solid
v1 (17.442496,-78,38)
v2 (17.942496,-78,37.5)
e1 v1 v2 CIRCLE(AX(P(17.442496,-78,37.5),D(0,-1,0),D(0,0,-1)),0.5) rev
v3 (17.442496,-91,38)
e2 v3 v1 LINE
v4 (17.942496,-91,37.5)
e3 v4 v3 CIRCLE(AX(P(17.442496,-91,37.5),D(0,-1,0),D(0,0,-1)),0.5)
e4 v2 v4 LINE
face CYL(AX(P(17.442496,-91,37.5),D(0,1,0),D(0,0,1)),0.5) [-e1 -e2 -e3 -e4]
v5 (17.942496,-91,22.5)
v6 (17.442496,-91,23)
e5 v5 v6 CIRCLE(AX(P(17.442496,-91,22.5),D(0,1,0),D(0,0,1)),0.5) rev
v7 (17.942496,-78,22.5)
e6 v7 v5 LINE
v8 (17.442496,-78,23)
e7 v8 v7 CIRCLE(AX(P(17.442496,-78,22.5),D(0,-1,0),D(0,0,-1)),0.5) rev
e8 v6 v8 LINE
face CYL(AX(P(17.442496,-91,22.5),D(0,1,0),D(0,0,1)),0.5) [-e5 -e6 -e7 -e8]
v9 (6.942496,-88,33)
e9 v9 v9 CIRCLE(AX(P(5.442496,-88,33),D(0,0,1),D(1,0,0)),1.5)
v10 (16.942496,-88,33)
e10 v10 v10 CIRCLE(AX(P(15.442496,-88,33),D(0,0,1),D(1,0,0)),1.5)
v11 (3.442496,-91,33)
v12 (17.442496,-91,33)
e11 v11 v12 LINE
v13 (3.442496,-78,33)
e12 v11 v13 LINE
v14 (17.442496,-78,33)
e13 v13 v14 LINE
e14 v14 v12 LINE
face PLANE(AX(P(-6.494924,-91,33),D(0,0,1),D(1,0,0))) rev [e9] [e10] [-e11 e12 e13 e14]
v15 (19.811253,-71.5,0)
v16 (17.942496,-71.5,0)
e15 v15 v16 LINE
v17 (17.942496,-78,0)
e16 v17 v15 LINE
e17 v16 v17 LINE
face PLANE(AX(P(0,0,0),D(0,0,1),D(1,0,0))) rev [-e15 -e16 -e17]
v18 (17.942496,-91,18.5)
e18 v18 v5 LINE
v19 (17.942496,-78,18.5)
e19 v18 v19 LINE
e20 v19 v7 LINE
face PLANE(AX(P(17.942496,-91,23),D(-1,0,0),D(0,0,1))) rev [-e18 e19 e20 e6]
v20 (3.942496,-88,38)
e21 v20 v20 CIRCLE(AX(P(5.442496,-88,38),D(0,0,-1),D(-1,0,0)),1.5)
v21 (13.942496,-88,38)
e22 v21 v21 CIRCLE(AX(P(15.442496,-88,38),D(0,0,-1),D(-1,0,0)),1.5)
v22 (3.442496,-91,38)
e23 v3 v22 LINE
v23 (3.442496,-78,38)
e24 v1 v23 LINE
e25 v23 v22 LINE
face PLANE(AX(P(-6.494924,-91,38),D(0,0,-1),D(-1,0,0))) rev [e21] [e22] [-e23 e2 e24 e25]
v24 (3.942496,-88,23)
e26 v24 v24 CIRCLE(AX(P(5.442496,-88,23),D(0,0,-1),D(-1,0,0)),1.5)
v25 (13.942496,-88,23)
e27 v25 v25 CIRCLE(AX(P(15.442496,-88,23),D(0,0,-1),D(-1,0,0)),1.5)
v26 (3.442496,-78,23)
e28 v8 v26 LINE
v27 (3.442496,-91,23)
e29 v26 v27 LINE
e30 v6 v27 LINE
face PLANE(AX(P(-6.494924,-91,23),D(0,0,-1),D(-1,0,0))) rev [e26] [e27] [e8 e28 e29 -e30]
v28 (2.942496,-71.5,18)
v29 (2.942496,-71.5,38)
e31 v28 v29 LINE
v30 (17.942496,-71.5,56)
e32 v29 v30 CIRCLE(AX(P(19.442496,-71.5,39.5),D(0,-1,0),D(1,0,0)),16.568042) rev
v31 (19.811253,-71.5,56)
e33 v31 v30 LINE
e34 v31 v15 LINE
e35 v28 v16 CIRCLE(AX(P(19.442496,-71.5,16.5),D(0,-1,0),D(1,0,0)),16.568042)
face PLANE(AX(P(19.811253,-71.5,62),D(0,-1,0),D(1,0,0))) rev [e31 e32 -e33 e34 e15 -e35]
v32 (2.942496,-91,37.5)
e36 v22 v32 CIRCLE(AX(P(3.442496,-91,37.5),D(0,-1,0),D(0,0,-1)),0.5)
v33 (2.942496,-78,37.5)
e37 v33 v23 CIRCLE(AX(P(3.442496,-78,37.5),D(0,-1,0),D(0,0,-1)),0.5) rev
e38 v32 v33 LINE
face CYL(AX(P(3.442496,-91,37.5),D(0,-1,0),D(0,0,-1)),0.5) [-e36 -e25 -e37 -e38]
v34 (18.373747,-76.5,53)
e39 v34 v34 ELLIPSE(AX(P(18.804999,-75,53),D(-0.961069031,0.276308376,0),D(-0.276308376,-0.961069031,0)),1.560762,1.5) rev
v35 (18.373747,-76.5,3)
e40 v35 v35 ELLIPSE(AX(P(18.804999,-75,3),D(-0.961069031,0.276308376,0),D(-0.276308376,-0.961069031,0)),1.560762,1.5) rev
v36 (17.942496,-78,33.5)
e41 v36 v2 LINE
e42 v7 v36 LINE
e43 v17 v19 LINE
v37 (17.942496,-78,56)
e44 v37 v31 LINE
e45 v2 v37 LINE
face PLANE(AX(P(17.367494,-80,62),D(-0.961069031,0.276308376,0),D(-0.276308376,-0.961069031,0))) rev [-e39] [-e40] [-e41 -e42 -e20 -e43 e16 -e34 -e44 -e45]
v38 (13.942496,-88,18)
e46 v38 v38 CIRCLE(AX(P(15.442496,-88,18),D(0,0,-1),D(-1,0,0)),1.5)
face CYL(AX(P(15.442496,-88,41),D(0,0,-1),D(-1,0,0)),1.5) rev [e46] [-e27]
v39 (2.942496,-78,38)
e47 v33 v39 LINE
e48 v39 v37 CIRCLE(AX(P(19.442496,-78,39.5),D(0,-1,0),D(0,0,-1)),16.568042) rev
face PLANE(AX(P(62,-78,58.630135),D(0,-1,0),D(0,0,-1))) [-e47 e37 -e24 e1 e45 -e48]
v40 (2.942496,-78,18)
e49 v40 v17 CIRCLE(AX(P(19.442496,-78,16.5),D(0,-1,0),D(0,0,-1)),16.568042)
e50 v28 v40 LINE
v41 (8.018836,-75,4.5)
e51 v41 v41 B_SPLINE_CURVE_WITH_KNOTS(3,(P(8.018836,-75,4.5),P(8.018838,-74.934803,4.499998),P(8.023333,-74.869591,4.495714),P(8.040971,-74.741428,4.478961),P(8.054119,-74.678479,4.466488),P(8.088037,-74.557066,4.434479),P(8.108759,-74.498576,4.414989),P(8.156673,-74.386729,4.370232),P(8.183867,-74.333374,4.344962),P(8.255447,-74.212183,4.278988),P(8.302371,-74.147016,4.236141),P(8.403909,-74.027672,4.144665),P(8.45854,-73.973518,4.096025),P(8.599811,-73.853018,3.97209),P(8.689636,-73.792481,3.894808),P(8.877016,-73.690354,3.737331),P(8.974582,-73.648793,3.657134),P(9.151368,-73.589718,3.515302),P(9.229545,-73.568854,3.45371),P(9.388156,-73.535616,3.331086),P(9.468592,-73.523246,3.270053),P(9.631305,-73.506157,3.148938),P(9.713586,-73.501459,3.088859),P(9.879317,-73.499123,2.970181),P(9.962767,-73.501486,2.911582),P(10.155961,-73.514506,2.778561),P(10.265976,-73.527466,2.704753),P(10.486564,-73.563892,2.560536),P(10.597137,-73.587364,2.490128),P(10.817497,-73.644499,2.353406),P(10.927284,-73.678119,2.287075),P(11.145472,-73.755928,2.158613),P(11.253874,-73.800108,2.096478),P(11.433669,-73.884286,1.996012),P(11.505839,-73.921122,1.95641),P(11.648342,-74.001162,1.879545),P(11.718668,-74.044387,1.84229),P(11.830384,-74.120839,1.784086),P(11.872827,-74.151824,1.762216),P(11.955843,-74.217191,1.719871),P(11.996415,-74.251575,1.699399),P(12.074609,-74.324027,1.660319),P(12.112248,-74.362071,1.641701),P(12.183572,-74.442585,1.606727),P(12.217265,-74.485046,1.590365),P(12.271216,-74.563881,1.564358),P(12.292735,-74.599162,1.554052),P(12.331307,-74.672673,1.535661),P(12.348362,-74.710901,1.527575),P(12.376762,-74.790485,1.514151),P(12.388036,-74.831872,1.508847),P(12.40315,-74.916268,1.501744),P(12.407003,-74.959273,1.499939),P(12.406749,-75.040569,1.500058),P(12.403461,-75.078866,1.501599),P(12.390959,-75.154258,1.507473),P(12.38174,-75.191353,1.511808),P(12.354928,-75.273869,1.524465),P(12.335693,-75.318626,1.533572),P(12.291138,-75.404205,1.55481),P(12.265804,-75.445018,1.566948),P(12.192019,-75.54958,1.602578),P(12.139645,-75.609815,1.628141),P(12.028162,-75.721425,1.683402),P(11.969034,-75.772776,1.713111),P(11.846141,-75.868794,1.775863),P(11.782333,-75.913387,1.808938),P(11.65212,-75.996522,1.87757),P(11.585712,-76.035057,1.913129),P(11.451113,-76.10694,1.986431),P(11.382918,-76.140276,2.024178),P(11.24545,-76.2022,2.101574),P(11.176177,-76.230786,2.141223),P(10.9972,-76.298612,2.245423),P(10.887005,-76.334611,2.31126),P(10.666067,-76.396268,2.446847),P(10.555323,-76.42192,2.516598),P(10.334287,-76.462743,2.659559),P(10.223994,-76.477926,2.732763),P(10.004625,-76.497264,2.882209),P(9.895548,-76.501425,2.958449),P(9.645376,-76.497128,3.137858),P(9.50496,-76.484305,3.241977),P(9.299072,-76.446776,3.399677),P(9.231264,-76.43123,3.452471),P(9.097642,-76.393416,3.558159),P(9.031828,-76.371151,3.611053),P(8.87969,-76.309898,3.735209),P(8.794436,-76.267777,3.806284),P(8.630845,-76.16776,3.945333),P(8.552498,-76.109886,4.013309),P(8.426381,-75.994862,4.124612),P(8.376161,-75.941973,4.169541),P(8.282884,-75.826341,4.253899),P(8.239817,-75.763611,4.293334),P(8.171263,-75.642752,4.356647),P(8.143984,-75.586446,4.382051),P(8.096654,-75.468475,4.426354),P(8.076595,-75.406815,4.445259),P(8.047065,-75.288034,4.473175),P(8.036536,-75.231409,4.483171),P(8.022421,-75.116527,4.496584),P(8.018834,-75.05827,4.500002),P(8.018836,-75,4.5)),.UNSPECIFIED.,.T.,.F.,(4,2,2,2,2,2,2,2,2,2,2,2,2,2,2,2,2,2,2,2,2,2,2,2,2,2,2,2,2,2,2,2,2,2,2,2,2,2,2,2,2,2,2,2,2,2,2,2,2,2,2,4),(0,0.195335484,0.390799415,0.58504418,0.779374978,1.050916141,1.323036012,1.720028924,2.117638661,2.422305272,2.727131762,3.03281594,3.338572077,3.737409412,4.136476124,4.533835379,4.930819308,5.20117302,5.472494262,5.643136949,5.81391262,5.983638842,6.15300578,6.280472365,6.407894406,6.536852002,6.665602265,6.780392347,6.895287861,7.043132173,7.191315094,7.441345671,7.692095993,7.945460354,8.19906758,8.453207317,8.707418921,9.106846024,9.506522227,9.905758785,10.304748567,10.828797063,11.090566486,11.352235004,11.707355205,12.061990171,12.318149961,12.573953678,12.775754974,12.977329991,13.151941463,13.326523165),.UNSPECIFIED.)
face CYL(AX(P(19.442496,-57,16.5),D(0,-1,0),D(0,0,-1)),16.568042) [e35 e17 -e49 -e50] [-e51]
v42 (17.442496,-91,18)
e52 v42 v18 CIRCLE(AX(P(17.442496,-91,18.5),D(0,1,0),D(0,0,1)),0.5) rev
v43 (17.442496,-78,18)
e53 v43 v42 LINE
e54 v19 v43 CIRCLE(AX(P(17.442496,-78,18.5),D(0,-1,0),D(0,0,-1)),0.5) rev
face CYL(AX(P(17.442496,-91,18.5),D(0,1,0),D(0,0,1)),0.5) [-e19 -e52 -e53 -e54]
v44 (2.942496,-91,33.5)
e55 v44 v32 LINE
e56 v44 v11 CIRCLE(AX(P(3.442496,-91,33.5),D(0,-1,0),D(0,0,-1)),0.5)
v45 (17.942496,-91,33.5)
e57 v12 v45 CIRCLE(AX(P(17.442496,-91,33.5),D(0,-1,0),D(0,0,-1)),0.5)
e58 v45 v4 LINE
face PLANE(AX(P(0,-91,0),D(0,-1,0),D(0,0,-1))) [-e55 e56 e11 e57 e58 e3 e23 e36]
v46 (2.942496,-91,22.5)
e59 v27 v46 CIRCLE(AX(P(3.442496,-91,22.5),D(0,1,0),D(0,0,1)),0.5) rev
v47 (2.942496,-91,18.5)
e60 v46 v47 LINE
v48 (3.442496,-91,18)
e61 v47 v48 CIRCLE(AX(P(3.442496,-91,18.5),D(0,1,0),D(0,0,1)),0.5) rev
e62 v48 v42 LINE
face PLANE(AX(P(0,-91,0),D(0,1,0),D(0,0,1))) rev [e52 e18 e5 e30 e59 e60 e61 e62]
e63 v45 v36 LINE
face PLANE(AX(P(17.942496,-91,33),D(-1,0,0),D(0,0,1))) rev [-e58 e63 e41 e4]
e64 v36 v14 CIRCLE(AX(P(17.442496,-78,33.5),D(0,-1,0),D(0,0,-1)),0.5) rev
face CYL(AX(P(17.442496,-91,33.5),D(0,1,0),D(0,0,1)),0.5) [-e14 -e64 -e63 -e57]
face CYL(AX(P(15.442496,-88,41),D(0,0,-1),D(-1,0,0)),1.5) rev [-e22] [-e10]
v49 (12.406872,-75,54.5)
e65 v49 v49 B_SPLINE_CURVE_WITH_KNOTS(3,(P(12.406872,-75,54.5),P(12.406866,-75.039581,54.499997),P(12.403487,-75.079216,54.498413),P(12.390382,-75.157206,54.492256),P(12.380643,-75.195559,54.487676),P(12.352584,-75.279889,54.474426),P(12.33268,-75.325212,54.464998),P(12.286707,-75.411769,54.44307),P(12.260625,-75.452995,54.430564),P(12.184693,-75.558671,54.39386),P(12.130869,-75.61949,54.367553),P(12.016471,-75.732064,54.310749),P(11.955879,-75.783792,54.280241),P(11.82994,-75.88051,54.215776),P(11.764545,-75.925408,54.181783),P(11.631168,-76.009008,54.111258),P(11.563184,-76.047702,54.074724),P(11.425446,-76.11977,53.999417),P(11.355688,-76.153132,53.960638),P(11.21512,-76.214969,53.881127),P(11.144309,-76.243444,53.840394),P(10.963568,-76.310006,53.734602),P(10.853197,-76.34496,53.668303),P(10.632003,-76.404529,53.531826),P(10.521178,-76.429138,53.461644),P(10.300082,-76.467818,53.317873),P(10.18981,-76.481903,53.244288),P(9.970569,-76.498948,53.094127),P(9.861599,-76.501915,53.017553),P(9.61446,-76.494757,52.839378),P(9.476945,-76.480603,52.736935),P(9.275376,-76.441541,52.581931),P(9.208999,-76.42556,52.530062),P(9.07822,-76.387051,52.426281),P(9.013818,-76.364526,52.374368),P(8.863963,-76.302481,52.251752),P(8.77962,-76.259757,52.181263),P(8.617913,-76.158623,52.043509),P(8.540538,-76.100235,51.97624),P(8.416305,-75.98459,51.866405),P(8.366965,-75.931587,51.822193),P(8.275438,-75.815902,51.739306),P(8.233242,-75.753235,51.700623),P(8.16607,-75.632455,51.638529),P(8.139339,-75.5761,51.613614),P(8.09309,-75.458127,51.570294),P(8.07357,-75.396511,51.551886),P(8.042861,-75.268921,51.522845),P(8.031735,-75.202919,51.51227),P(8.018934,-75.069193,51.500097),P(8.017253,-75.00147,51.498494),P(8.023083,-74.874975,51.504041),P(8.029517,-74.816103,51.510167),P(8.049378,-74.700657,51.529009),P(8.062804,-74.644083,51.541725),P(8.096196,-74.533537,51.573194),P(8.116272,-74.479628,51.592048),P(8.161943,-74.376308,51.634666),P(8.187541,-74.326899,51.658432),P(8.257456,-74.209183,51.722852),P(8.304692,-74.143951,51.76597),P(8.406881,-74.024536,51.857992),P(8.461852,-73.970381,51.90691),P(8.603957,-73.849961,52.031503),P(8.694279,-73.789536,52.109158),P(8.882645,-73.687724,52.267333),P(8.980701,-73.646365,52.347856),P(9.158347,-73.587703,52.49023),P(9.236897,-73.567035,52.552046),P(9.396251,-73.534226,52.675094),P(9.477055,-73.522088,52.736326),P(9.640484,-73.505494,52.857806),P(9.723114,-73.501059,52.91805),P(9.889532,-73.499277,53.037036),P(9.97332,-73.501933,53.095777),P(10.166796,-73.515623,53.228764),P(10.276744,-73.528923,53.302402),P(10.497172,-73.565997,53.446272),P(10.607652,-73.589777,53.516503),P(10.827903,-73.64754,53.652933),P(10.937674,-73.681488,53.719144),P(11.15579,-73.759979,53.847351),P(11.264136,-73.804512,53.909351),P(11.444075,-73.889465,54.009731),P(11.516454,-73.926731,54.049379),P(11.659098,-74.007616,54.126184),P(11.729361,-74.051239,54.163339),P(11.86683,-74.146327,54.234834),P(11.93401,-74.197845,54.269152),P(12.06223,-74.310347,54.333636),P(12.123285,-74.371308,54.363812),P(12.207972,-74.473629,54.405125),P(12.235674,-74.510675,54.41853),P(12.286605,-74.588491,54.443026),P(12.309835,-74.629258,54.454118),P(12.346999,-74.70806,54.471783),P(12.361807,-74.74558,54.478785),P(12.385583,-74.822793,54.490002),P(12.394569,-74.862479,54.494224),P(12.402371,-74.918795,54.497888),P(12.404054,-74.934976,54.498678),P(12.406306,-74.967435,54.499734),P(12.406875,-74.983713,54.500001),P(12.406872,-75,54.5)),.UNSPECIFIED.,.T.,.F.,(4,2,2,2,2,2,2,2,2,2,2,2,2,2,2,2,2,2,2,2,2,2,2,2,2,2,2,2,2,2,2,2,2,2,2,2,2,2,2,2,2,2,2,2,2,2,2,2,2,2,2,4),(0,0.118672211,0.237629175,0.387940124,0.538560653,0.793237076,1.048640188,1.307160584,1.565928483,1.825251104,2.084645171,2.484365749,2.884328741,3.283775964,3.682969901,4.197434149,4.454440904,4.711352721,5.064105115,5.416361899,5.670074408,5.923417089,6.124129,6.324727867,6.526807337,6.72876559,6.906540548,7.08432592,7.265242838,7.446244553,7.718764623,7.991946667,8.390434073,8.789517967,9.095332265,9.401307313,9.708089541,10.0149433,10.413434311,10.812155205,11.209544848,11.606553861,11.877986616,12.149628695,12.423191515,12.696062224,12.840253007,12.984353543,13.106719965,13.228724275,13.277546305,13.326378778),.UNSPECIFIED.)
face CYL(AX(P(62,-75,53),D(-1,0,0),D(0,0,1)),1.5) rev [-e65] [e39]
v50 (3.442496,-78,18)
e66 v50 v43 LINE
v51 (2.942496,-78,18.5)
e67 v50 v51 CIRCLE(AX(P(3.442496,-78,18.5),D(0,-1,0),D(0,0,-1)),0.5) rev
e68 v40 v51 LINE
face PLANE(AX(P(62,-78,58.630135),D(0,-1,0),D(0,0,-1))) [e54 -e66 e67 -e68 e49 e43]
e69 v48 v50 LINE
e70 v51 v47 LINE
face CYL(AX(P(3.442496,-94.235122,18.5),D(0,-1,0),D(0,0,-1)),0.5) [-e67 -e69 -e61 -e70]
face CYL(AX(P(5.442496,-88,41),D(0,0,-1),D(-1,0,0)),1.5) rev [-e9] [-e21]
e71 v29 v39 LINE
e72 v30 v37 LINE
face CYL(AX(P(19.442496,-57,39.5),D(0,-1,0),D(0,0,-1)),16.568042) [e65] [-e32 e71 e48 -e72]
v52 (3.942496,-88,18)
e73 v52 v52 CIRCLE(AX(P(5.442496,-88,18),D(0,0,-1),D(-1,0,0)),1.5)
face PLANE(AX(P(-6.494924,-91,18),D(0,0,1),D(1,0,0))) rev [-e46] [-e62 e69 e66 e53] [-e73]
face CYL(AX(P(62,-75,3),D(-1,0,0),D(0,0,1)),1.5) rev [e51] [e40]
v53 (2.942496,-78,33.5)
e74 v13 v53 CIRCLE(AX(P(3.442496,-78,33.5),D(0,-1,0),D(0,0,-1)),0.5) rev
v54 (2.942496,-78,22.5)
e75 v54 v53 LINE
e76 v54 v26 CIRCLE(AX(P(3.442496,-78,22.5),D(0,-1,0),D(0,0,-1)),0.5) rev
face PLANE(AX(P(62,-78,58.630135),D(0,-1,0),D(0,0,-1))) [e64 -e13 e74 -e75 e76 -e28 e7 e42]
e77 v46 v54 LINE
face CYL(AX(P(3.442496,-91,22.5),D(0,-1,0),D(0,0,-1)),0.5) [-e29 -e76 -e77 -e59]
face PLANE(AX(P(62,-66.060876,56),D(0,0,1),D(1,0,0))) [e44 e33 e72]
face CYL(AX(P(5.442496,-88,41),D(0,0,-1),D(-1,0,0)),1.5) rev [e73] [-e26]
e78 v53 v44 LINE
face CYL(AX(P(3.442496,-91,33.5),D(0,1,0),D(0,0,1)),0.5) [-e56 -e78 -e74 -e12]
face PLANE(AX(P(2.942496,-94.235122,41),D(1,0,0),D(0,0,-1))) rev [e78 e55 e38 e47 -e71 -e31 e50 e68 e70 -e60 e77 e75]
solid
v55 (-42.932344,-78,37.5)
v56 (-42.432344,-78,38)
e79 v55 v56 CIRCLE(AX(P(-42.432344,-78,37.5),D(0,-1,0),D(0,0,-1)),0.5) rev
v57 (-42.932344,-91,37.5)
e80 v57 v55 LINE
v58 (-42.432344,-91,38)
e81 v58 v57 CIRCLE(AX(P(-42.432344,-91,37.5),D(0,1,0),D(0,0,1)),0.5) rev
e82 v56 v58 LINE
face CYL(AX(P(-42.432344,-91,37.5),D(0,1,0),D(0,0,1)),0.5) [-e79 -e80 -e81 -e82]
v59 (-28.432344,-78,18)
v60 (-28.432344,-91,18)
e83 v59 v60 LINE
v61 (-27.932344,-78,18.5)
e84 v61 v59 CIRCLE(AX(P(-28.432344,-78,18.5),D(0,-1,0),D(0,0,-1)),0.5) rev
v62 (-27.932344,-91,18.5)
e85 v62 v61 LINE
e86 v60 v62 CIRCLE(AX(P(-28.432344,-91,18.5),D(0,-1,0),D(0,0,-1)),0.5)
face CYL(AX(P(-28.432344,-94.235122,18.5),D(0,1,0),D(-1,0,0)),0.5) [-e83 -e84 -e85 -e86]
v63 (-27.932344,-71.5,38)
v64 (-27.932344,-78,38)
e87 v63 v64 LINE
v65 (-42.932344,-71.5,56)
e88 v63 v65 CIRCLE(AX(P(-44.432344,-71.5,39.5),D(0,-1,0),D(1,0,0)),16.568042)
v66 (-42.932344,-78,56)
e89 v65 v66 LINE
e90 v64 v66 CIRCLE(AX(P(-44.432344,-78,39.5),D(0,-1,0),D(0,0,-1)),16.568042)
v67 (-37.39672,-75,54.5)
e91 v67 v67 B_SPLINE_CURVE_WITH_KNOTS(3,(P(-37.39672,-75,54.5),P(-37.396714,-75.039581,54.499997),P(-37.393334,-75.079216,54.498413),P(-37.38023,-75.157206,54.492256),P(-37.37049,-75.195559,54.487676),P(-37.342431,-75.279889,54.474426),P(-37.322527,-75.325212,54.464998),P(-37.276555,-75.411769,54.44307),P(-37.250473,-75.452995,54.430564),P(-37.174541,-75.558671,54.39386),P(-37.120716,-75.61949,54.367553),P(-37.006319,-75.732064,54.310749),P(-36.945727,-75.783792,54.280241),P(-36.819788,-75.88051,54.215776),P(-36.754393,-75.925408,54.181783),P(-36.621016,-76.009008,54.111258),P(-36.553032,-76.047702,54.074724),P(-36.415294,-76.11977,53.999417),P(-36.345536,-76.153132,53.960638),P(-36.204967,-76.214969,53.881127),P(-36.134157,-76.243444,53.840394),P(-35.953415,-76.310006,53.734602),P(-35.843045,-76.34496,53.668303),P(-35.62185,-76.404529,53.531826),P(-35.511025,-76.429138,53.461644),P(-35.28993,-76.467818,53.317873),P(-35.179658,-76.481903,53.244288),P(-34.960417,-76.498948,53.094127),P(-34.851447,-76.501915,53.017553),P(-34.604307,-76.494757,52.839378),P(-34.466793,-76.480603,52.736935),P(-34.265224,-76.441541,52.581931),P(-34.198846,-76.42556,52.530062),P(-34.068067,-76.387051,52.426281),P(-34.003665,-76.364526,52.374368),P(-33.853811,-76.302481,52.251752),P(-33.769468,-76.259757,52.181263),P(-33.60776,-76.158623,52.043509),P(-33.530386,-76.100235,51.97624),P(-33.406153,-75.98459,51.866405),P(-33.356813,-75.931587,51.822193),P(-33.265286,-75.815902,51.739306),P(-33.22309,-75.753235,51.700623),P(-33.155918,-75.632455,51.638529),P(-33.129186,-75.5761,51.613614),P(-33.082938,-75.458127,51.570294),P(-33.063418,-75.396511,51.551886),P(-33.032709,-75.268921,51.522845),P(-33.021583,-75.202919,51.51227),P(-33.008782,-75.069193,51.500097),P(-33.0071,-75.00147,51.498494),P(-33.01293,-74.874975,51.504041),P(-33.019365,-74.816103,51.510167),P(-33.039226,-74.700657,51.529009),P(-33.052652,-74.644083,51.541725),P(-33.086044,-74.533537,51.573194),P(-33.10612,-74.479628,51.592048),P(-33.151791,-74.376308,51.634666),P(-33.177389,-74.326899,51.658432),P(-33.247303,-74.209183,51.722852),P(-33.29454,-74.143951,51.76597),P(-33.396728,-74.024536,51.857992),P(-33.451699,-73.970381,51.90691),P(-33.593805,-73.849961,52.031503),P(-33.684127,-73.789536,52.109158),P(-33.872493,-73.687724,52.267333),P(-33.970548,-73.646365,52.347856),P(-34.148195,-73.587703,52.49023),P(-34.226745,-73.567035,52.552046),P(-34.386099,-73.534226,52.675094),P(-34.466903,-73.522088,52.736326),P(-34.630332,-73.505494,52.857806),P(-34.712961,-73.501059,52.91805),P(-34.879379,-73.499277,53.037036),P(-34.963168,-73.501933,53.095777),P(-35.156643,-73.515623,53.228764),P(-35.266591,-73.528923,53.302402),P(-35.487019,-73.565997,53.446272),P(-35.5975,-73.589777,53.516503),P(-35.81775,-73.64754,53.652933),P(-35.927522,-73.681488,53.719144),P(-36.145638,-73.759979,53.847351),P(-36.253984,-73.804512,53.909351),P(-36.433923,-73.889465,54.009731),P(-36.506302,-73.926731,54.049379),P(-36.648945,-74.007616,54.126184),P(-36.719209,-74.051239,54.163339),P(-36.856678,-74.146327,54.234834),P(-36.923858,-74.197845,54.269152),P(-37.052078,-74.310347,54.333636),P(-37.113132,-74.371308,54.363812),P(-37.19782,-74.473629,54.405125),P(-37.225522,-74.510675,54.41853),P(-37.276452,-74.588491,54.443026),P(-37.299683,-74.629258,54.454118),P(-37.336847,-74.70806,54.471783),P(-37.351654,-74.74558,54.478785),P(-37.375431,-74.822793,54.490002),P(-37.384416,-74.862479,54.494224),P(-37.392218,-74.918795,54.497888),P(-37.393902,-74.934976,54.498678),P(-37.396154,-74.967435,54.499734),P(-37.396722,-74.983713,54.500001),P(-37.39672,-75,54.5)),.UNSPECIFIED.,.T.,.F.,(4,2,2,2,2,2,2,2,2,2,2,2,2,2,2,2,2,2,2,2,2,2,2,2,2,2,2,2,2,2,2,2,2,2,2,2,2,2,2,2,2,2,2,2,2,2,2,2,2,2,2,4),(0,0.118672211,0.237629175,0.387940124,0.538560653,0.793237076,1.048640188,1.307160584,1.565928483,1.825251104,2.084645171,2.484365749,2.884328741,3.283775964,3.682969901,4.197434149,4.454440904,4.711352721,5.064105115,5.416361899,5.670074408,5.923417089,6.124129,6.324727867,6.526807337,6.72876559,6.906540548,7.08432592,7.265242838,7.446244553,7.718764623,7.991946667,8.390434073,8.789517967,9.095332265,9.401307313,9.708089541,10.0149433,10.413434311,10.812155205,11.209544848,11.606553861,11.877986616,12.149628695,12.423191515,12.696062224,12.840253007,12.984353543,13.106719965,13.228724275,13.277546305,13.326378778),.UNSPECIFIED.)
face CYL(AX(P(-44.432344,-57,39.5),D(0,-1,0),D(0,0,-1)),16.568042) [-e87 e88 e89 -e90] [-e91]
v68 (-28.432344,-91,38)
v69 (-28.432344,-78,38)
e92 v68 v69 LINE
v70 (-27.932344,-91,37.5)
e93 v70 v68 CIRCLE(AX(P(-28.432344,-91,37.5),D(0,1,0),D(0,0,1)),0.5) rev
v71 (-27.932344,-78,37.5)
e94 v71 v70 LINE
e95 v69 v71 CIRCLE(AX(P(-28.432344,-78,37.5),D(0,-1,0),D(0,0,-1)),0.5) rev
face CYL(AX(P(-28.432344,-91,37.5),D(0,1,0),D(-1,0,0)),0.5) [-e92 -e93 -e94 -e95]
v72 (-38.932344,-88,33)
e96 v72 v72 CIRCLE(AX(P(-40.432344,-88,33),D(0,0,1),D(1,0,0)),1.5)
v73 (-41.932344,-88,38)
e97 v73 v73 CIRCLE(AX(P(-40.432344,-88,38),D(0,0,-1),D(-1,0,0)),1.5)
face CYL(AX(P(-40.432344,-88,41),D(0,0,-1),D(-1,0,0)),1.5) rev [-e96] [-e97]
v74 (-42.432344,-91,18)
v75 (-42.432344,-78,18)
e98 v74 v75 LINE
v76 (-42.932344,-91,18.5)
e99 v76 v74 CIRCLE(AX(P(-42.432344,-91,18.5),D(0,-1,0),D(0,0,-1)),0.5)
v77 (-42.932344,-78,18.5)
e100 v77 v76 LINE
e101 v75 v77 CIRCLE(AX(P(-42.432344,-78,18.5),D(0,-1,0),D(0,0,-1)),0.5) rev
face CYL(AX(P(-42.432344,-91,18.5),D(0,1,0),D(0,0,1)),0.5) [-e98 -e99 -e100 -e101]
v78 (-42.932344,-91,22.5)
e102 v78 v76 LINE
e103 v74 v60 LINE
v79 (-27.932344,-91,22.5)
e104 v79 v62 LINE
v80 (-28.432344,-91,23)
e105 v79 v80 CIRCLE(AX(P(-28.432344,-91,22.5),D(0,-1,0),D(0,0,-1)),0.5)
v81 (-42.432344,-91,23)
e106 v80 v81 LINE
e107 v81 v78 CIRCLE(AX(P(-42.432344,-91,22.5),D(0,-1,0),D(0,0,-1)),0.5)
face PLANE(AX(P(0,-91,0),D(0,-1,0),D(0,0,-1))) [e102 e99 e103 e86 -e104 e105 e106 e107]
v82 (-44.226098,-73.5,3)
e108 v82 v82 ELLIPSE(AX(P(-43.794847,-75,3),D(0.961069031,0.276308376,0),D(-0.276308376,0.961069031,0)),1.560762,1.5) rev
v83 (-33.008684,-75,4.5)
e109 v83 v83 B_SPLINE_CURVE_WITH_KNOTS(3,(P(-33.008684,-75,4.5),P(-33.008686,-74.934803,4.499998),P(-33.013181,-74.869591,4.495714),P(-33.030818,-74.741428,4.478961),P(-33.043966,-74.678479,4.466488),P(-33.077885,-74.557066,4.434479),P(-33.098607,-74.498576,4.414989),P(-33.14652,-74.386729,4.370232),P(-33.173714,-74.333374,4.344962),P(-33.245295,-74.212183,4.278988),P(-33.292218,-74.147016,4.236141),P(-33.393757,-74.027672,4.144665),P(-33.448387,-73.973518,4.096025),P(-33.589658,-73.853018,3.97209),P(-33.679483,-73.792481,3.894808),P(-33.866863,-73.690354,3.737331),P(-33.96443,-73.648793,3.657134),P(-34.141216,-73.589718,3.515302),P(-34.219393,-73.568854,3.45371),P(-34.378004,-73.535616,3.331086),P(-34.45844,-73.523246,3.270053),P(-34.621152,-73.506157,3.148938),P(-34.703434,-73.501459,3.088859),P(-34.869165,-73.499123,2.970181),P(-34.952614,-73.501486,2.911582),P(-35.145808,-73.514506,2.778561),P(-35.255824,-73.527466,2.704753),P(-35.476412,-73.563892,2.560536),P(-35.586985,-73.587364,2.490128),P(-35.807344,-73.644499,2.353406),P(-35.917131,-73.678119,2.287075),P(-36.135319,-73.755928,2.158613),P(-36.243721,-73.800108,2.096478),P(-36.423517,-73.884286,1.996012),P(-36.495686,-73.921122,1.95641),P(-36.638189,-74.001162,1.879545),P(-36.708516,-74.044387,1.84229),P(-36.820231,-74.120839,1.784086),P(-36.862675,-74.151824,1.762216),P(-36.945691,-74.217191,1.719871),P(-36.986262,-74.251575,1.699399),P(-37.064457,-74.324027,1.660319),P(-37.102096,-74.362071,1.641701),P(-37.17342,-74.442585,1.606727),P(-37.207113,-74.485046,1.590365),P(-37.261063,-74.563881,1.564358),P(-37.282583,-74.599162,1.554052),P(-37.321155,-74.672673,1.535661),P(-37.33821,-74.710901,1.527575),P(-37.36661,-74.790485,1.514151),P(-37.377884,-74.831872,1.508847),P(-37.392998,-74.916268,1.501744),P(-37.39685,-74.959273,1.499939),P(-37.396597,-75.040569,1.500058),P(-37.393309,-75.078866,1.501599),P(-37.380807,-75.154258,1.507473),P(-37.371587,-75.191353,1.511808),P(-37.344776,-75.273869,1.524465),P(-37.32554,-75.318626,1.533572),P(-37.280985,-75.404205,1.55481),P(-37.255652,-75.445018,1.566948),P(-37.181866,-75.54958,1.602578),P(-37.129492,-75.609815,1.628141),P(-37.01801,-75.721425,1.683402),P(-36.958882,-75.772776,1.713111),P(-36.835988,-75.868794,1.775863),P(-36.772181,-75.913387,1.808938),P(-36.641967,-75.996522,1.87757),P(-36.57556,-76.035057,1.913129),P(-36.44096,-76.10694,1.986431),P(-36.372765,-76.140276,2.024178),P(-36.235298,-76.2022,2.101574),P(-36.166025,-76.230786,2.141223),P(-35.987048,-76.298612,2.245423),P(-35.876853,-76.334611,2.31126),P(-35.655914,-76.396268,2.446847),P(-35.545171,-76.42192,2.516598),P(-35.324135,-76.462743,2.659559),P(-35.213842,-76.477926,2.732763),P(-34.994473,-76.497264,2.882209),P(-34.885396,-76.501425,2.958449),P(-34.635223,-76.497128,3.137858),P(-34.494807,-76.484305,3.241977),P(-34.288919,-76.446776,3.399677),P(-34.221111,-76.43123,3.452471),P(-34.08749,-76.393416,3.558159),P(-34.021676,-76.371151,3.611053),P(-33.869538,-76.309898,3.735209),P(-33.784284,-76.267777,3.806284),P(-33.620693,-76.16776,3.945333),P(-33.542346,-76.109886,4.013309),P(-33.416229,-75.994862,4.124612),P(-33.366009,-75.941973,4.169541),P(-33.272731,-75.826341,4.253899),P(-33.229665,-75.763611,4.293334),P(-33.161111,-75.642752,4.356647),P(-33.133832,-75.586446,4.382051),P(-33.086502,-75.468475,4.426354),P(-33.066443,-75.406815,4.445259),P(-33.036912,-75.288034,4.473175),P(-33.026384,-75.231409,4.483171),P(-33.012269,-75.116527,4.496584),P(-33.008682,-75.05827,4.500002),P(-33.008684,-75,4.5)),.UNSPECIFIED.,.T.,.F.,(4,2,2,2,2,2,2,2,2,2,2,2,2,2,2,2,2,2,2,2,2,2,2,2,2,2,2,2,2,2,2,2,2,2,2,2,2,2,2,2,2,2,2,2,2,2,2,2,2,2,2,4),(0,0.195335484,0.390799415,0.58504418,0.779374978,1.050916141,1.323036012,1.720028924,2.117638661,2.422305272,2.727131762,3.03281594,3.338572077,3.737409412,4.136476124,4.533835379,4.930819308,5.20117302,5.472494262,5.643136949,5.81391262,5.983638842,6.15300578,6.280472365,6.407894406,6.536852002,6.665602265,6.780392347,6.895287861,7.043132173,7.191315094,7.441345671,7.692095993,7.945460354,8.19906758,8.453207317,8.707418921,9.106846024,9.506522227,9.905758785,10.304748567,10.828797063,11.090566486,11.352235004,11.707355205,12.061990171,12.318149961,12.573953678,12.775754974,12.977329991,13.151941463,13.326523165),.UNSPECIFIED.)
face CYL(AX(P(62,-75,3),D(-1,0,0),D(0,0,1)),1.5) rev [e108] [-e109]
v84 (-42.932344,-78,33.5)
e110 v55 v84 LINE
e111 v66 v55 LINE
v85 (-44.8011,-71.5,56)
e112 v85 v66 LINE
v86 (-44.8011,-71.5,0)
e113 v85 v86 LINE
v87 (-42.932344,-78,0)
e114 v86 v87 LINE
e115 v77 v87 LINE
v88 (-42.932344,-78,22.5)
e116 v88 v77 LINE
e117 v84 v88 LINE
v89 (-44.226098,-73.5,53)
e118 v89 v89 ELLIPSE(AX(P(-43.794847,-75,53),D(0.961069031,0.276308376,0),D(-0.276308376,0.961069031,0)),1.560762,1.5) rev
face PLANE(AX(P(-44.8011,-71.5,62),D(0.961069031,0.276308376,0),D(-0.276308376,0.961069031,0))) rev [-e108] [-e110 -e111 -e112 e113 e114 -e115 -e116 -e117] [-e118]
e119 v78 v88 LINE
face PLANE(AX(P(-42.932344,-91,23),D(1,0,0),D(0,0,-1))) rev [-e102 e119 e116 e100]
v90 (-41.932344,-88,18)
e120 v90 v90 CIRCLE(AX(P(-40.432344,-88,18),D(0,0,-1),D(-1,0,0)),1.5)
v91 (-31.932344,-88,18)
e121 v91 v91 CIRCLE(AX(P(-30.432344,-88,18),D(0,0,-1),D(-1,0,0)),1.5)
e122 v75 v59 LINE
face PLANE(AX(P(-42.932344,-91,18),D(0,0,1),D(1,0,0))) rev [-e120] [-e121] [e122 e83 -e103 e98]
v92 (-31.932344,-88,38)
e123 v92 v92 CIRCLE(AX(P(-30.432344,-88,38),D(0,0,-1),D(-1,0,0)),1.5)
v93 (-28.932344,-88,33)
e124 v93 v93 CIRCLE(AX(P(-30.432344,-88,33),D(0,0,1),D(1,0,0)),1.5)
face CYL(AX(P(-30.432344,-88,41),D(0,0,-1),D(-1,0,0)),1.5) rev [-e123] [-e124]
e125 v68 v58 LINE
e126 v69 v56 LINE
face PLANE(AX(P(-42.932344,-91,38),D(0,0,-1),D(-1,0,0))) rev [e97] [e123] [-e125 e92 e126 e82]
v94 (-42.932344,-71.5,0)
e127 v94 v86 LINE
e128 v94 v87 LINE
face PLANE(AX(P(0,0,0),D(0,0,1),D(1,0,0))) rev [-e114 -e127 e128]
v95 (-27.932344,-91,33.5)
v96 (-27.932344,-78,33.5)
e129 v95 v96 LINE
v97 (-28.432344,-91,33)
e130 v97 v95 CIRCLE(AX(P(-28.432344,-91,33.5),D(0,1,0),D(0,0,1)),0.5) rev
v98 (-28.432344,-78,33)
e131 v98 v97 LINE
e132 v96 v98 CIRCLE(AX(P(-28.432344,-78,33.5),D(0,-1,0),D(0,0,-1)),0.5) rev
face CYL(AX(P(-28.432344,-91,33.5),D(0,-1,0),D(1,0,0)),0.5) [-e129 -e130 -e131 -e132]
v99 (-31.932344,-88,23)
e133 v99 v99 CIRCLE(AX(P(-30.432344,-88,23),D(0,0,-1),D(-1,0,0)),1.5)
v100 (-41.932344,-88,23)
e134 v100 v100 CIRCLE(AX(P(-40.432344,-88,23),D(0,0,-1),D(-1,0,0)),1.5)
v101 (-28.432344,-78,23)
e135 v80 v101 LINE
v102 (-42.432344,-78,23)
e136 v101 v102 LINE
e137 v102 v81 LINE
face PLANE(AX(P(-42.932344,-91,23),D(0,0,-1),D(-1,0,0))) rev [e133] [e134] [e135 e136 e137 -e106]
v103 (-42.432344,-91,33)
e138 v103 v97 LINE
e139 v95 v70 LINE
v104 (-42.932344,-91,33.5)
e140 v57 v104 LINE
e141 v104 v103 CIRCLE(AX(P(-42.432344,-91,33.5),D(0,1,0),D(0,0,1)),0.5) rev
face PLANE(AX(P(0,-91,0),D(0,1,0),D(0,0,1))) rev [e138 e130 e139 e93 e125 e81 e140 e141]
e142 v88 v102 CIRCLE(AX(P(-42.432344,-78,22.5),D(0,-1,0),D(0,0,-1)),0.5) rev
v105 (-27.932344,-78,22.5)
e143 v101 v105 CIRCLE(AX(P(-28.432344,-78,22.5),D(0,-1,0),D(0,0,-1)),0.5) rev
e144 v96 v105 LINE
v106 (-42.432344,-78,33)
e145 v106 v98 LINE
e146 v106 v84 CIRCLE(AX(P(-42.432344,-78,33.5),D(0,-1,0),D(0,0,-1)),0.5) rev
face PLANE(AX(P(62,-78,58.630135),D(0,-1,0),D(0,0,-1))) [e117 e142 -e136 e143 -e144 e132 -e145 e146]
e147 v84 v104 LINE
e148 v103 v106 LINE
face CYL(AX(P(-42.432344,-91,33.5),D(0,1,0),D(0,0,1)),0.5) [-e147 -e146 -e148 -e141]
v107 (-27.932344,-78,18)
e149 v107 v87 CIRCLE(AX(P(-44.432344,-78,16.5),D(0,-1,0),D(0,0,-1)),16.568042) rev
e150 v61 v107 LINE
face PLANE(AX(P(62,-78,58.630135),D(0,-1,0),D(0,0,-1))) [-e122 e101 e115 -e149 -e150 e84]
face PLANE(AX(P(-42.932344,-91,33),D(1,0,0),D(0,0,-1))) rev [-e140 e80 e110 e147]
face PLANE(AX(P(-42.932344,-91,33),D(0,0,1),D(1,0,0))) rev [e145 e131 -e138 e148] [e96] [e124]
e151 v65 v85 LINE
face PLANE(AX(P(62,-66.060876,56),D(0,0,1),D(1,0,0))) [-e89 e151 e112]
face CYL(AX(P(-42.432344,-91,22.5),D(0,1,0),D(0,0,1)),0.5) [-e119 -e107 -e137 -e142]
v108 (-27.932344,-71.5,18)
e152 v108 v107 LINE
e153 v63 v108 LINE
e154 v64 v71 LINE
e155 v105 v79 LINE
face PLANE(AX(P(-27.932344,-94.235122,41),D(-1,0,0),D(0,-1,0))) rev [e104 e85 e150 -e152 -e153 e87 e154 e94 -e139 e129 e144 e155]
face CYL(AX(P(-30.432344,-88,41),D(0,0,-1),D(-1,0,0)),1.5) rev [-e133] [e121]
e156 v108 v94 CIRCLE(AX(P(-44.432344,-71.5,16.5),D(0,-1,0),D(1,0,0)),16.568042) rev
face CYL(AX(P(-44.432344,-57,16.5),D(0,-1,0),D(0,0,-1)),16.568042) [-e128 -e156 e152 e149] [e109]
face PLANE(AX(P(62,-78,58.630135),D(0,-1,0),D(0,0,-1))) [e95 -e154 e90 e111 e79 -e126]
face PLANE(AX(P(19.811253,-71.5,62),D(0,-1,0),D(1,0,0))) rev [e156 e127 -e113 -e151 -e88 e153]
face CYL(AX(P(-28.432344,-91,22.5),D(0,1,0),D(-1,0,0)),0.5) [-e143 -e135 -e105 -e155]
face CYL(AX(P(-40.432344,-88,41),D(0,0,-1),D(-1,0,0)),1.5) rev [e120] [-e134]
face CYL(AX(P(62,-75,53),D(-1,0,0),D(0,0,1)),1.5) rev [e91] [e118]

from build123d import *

# Parameters (mm, degrees)
BOSS_EXTRUDE1_DEPTH     = 62
CUT_EXTRUDE1_DEPTH      = 62
CUT_EXTRUDE1_DEPTH_BACK = 62
SKETCH2_R               = 1.5
CUT_EXTRUDE2_DEPTH      = 62
CUT_EXTRUDE2_DEPTH_BACK = 62
SKETCH3_W               = 8.022178305
SKETCH3_H               = 21.045195033
CUT_EXTRUDE3_DEPTH      = 62
CUT_EXTRUDE3_DEPTH_BACK = 62
SKETCH4_W               = 61.260270692
SKETCH4_H               = 6.493024082
SKETCH5_W               = 24.437419654
SKETCH5_H               = 5
BOSS_EXTRUDE2_DEPTH     = 13
SKETCH7_R               = 1.5
SKETCH7_W               = 30.874839308
SKETCH7_H               = 16.235122229
CUT_EXTRUDE4_DEPTH      = 23
CUT_EXTRUDE5_DEPTH      = 20
CUT_EXTRUDE5_DEPTH_BACK = 21
FILLET1_R               = 0.5
FILLET2_R               = 0.5
FILLET3_R               = 0.5
FILLET4_R               = 0.5
FILLET5_R               = 0.5
FILLET6_R               = 0.5
FILLET7_R               = 0.5
FILLET8_R               = 0.5
FILLET9_R               = 0.5
FILLET10_R              = 0.5
FILLET11_R              = 0.5
FILLET12_R              = 0.5
FILLET13_R              = 0.5
FILLET14_R              = 0.5
FILLET15_R              = 0.5
FILLET16_R              = 0.5


with BuildPart() as part:
    # Sketch1 → Boss-Extrude1 (new body)
    with BuildSketch(Plane.XY):
        Polygon((-42.357341369, -80), (17.367493653, -80), (19.811252759, -71.5), (-44.801100475, -71.5), align=None)
    extrude(amount=BOSS_EXTRUDE1_DEPTH)

    # Sketch2 → Cut-Extrude1 (cut, two sides: drawn at the far end of the back side and taken through both)
    with BuildSketch(Plane(origin=(0, 0, 0), x_dir=(0, 0, -1), z_dir=(1, 0, 0)).offset(-CUT_EXTRUDE1_DEPTH_BACK)):
        with Locations(Location((-53, -75, 0), (0, 0, 90))):
            Circle(SKETCH2_R)
        with Locations(Location((-3, -75, 0), (0, 0, 90))):
            Circle(SKETCH2_R)
    extrude(amount=CUT_EXTRUDE1_DEPTH + CUT_EXTRUDE1_DEPTH_BACK, mode=Mode.SUBTRACT)

    # Sketch3 → Cut-Extrude2 (cut, two sides: drawn at the far end of the back side and taken through both)
    with BuildSketch(Plane(origin=(0, 0, 0), x_dir=(0, 0, -1), z_dir=(1, 0, 0)).offset(-CUT_EXTRUDE2_DEPTH_BACK)):
        with Locations((-60.011089152, -76.583473071)):
            Rectangle(SKETCH3_W, SKETCH3_H)
    extrude(amount=CUT_EXTRUDE2_DEPTH + CUT_EXTRUDE2_DEPTH_BACK, mode=Mode.SUBTRACT)

    # Sketch4 → Cut-Extrude3 (cut, two sides: drawn at the far end of the back side and taken through both)
    with BuildSketch(Plane(origin=(0, 0, 0), x_dir=(0, 0, -1), z_dir=(1, 0, 0)).offset(-CUT_EXTRUDE3_DEPTH_BACK)):
        with Locations((-28, -81.246512041)):
            Rectangle(SKETCH4_W, SKETCH4_H)
    extrude(amount=CUT_EXTRUDE3_DEPTH + CUT_EXTRUDE3_DEPTH_BACK, mode=Mode.SUBTRACT)

    # Sketch5 → Boss-Extrude2 (add)
    with BuildSketch(Plane.XZ.offset(78)):
        with Locations((-30.713633685, 35.5)):
            Rectangle(SKETCH5_W, SKETCH5_H)
        with Locations((5.723785969, 35.5)):
            Rectangle(SKETCH5_W, SKETCH5_H)
        with Locations((-30.713633685, 20.5)):
            Rectangle(SKETCH5_W, SKETCH5_H)
        with Locations((5.723785969, 20.5)):
            Rectangle(SKETCH5_W, SKETCH5_H)
    extrude(amount=BOSS_EXTRUDE2_DEPTH)

    # Sketch7 → Cut-Extrude4 (cut)
    with BuildSketch(Plane(origin=(0, 0, 18), x_dir=(-1, 0, 0), z_dir=(0, 0, -1))):
        with Locations((-15.442495796, -88)):
            Circle(SKETCH7_R)
        with Locations((-5.442495796, -88)):
            Circle(SKETCH7_R)
        with Locations((30.432343512, -88)):
            Circle(SKETCH7_R)
        with Locations((40.432343512, -88)):
            Circle(SKETCH7_R)
        with Locations((12.494923858, -86.117561115)):
            Rectangle(SKETCH7_W, SKETCH7_H)
    extrude(amount=-CUT_EXTRUDE4_DEPTH, mode=Mode.SUBTRACT)

    # Sketch8 → Cut-Extrude5 (cut, two sides: drawn at the far end of the back side and taken through both)
    with BuildSketch(Plane.XZ.offset(78).offset(-CUT_EXTRUDE5_DEPTH_BACK)):
        with BuildLine():
            ThreePointArc((-42.932343512, 56), (-31.70442145, 50.106601718), (-27.932343512, 38))
            Line((-27.932343512, 38), (-27.932343512, 33))
            Line((-27.932343512, 33), (-27.932343512, 23))
            Line((-27.932343512, 23), (-27.932343512, 18))
            ThreePointArc((-27.932343512, 18), (-31.70442145, 5.893398282), (-42.932343512, 0))
            Line((-42.932343512, 0), (17.942495796, 0))
            ThreePointArc((17.942495796, 0), (6.714573734, 5.893398282), (2.942495796, 18))
            Line((2.942495796, 18), (2.942495796, 23))
            Line((2.942495796, 23), (2.942495796, 33))
            Line((2.942495796, 33), (2.942495796, 38))
            ThreePointArc((2.942495796, 38), (6.714573734, 50.106601718), (17.942495796, 56))
            Line((17.942495796, 56), (-42.932343512, 56))
        make_face()
    extrude(amount=CUT_EXTRUDE5_DEPTH + CUT_EXTRUDE5_DEPTH_BACK, mode=Mode.SUBTRACT)


with BuildPart() as cut_extrude5_piece_1:
    # of the separate pieces the step leaves, piece 1, a body of its own (cut_extrude5_pieces)
    add(part.part.solids().sort_by_distance((17.942495796, -71.5, 0))[0])

    # Fillet1
    fillet1_edges = [cut_extrude5_piece_1.edges().sort_by_distance(p)[0] for p in [
        (17.942495796, -84.5, 33),
    ]]
    fillet(fillet1_edges, radius=FILLET1_R)

    # Fillet2
    fillet2_edges = [cut_extrude5_piece_1.edges().sort_by_distance(p)[0] for p in [
        (17.942495796, -84.5, 38),
    ]]
    fillet(fillet2_edges, radius=FILLET2_R)

    # Fillet3
    # the kernel refuses this fillet: 0.5 mm, written as the material it takes off along each edge
    with BuildSketch(Plane(origin=(17.942495796, -78, 23), x_dir=(-1, 0, 0), z_dir=(0, -1, 0))) as fillet3_piece_1_section:
        with BuildLine():
            CenterArc((FILLET3_R, FILLET3_R), FILLET3_R, 180, 90)
            Line((0, FILLET3_R), (0, 0))
            Line((0, 0), (FILLET3_R, 0))
        make_face()
    fillet3_piece_1 = extrude(amount=14.25, mode=Mode.PRIVATE)
    fillet3_piece_1 = split(fillet3_piece_1, bisect_by=Plane(origin=(17.826756801, -78.402568918, 22.946763744), z_dir=(-0.9610690305242926, 0.2763083758540381, 0)), keep=Keep.TOP, mode=Mode.PRIVATE)
    add(fillet3_piece_1, mode=Mode.SUBTRACT)
    with BuildSketch(Plane(origin=(17.942495796, -78, 23), x_dir=(-1, 0, 0), z_dir=(0, -1, 0))) as fillet3_piece_2_section:
        with BuildLine():
            CenterArc((FILLET3_R, FILLET3_R), FILLET3_R, 180, 90)
            Line((0, FILLET3_R), (0, 0))
            Line((0, 0), (FILLET3_R, 0))
        make_face()
    fillet3_piece_2 = extrude(amount=14.25, mode=Mode.PRIVATE)
    fillet3_piece_2 = split(fillet3_piece_2, bisect_by=Plane(origin=(15.990895382, -84.788150058, 22.885092436), z_dir=(0.9610690305242926, -0.2763083758540381, 0)), keep=Keep.TOP, mode=Mode.PRIVATE)
    add(fillet3_piece_2, mode=Mode.SUBTRACT)

    # Fillet4
    fillet4_edges = [cut_extrude5_piece_1.edges().sort_by_distance(p)[0] for p in [
        (17.942495796, -84.5, 18),
    ]]
    fillet(fillet4_edges, radius=FILLET4_R)

    # Fillet5
    fillet5_edges = [cut_extrude5_piece_1.edges().sort_by_distance(p)[0] for p in [
        (2.942495796, -84.5, 18),
    ]]
    fillet(fillet5_edges, radius=FILLET5_R)

    # Fillet6
    fillet6_edges = [cut_extrude5_piece_1.edges().sort_by_distance(p)[0] for p in [
        (2.942495796, -84.5, 33),
    ]]
    fillet(fillet6_edges, radius=FILLET6_R)

    # Fillet7
    fillet7_edges = [cut_extrude5_piece_1.edges().sort_by_distance(p)[0] for p in [
        (2.942495796, -84.5, 23),
    ]]
    fillet(fillet7_edges, radius=FILLET7_R)

    # Fillet8
    fillet8_edges = [cut_extrude5_piece_1.edges().sort_by_distance(p)[0] for p in [
        (2.942495796, -84.5, 38),
    ]]
    fillet(fillet8_edges, radius=FILLET8_R)


with BuildPart() as cut_extrude5_piece_2:
    # of the separate pieces the step leaves, piece 2, a body of its own (cut_extrude5_pieces)
    add(part.part.solids().sort_by_distance((-42.932343512, -71.5, 0))[0])

    # Fillet9
    fillet9_edges = [cut_extrude5_piece_2.edges().sort_by_distance(p)[0] for p in [
        (-42.932343512, -84.5, 18),
    ]]
    fillet(fillet9_edges, radius=FILLET9_R)

    # Fillet10
    fillet10_edges = [cut_extrude5_piece_2.edges().sort_by_distance(p)[0] for p in [
        (-27.932343512, -84.5, 18),
    ]]
    fillet(fillet10_edges, radius=FILLET10_R)

    # Fillet11
    fillet11_edges = [cut_extrude5_piece_2.edges().sort_by_distance(p)[0] for p in [
        (-27.932343512, -84.5, 23),
    ]]
    fillet(fillet11_edges, radius=FILLET11_R)

    # Fillet12
    fillet12_edges = [cut_extrude5_piece_2.edges().sort_by_distance(p)[0] for p in [
        (-27.932343512, -84.5, 33),
    ]]
    fillet(fillet12_edges, radius=FILLET12_R)

    # Fillet13
    fillet13_edges = [cut_extrude5_piece_2.edges().sort_by_distance(p)[0] for p in [
        (-27.932343512, -84.5, 38),
    ]]
    fillet(fillet13_edges, radius=FILLET13_R)

    # Fillet14
    fillet14_edges = [cut_extrude5_piece_2.edges().sort_by_distance(p)[0] for p in [
        (-42.932343512, -84.5, 38),
    ]]
    fillet(fillet14_edges, radius=FILLET14_R)

    # Fillet15
    fillet15_edges = [cut_extrude5_piece_2.edges().sort_by_distance(p)[0] for p in [
        (-42.932343512, -84.5, 33),
    ]]
    fillet(fillet15_edges, radius=FILLET15_R)

    # Fillet16
    # the kernel refuses this fillet: 0.5 mm, written as the material it takes off along each edge
    with BuildSketch(Plane(origin=(-42.932343512, -78, 23), x_dir=(0, 0, -1), z_dir=(0, -1, 0))) as fillet16_piece_1_section:
        with BuildLine():
            CenterArc((FILLET16_R, FILLET16_R), FILLET16_R, 180, 90)
            Line((0, FILLET16_R), (0, 0))
            Line((0, 0), (FILLET16_R, 0))
        make_face()
    fillet16_piece_1 = extrude(amount=14.25, mode=Mode.PRIVATE)
    fillet16_piece_1 = split(fillet16_piece_1, bisect_by=Plane(origin=(-42.816604516, -78.402568918, 22.946763744), z_dir=(0.9610690305242929, 0.2763083758540371, 0)), keep=Keep.TOP, mode=Mode.PRIVATE)
    add(fillet16_piece_1, mode=Mode.SUBTRACT)
    with BuildSketch(Plane(origin=(-42.932343512, -78, 23), x_dir=(0, 0, -1), z_dir=(0, -1, 0))) as fillet16_piece_2_section:
        with BuildLine():
            CenterArc((FILLET16_R, FILLET16_R), FILLET16_R, 180, 90)
            Line((0, FILLET16_R), (0, 0))
            Line((0, 0), (FILLET16_R, 0))
        make_face()
    fillet16_piece_2 = extrude(amount=14.25, mode=Mode.PRIVATE)
    fillet16_piece_2 = split(fillet16_piece_2, bisect_by=Plane(origin=(-40.980743098, -84.788150058, 22.885092436), z_dir=(-0.9610690305242929, -0.2763083758540371, 0)), keep=Keep.TOP, mode=Mode.PRIVATE)
    add(fillet16_piece_2, mode=Mode.SUBTRACT)


solid = Compound([cut_extrude5_piece_1.part, cut_extrude5_piece_2.part])
